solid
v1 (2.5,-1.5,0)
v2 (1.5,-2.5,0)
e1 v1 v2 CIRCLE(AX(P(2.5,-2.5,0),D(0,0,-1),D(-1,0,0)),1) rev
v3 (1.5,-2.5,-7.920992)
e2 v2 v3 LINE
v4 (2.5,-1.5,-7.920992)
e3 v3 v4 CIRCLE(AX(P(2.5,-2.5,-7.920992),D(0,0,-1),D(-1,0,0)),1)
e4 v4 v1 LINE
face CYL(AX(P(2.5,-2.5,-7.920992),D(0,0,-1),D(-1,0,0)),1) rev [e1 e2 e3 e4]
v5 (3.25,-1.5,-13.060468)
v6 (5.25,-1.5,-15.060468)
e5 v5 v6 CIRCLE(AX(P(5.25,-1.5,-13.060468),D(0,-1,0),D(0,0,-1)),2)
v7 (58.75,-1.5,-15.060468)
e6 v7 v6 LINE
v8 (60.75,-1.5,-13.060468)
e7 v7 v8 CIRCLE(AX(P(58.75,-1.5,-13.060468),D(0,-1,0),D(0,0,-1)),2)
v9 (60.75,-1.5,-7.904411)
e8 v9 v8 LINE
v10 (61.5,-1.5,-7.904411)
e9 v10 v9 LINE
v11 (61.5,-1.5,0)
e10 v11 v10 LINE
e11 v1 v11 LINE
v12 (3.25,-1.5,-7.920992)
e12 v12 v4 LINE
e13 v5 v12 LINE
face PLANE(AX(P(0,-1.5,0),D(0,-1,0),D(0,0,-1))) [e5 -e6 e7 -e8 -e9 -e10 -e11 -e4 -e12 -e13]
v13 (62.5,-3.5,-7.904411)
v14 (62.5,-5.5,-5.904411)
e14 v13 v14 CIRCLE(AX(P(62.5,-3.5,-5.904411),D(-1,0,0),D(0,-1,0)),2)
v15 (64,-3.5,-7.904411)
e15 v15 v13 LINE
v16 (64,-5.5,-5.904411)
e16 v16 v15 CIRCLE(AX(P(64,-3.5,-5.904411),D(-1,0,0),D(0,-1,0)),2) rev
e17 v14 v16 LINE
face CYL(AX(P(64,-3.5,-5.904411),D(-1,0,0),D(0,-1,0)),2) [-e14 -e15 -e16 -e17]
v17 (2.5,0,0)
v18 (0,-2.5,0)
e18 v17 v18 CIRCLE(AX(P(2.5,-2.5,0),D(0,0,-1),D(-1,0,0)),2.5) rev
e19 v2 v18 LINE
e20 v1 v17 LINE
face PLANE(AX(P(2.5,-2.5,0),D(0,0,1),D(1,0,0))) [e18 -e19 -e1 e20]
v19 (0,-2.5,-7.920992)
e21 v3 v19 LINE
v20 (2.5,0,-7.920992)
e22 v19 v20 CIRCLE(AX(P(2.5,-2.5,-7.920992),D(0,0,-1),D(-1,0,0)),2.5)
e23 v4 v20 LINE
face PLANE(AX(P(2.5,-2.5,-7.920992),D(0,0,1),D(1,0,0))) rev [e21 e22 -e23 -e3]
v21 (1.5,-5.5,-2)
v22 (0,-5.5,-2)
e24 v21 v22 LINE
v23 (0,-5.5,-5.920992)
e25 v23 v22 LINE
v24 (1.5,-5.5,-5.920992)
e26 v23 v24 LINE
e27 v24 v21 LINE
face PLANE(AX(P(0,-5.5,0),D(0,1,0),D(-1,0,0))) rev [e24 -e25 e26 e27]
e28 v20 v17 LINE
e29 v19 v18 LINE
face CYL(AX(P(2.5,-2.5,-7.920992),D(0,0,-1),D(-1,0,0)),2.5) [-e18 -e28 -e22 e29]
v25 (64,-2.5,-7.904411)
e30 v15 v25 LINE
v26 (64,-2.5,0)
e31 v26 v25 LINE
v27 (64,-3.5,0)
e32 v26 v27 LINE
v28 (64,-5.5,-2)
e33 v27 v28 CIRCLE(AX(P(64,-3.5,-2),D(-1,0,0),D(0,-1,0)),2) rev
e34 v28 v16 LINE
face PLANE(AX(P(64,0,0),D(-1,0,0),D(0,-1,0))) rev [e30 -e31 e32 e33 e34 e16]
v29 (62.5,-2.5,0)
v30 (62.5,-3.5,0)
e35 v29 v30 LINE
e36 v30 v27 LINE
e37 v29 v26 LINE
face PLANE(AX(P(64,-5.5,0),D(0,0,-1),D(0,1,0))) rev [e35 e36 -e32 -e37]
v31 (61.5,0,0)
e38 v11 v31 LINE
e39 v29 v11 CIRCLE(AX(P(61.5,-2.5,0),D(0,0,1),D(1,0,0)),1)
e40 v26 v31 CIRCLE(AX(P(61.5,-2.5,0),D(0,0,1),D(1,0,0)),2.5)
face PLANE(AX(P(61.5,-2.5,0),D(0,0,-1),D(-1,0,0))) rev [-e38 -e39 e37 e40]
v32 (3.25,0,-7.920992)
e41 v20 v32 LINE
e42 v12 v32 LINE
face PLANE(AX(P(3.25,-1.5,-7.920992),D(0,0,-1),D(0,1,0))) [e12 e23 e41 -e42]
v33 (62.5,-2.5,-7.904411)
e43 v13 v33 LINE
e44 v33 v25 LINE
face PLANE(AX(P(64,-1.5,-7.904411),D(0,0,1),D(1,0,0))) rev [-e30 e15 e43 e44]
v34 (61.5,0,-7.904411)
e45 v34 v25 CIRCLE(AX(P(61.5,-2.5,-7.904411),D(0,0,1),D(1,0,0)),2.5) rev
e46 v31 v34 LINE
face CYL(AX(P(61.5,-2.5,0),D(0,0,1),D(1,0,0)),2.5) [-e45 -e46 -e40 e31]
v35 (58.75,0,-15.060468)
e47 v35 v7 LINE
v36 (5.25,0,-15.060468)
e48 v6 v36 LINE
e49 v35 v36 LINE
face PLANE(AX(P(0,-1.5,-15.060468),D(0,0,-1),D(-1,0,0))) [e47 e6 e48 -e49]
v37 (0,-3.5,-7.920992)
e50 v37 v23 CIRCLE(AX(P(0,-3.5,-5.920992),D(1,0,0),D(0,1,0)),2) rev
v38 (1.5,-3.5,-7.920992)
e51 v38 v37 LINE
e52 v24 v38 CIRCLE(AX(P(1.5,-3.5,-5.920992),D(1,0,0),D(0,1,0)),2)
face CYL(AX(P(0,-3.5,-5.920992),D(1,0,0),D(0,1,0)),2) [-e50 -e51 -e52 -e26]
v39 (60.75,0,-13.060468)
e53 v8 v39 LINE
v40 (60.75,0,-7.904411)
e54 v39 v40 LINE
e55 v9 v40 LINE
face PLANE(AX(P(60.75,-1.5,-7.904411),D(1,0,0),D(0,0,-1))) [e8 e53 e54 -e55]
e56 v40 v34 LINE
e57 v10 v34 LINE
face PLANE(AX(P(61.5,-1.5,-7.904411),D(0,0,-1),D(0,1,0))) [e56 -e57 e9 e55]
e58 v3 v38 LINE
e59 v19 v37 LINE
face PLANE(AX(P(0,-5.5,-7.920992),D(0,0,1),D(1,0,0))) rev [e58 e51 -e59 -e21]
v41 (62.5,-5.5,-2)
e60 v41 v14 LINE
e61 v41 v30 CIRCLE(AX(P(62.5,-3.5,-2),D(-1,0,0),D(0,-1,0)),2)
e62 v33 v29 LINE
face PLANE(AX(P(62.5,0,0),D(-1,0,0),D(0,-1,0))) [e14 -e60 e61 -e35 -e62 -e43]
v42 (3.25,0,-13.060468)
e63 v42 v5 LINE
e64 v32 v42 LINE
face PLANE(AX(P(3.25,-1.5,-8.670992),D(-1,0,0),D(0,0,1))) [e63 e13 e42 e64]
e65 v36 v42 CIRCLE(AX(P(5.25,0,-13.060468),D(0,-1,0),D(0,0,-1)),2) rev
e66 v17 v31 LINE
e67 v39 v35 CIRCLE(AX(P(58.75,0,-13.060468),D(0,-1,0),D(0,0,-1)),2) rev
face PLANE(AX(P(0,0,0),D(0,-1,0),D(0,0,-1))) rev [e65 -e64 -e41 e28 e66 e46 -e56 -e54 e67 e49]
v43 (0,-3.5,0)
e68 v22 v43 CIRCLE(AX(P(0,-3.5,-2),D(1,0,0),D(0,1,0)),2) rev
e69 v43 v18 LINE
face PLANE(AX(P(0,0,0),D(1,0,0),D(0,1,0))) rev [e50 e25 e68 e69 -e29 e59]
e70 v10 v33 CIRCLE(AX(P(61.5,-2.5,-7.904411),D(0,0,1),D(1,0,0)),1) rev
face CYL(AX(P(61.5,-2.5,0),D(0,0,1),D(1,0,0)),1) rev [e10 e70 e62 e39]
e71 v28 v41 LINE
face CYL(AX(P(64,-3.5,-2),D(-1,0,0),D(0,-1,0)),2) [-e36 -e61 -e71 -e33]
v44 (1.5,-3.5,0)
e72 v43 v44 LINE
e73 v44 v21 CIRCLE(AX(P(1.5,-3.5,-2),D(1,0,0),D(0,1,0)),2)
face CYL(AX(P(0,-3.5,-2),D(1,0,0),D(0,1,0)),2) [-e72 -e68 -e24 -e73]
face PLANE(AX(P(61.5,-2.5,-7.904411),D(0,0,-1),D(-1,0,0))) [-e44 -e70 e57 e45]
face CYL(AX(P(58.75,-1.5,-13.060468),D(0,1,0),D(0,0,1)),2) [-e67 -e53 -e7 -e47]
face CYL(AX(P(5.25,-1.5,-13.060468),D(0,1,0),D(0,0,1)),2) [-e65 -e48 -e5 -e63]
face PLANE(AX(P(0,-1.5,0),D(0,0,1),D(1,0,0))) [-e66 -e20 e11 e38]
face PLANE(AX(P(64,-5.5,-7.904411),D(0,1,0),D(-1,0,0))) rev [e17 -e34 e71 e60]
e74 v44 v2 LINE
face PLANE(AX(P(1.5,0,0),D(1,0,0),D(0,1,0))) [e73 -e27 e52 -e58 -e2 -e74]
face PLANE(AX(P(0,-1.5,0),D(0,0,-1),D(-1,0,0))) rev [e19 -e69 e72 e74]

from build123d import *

# Parameters (mm, degrees)
SKETCH1_W                       = 64
SKETCH1_H                       = 15.060468003
BASE_FLANGE1_DEPTH              = 1.5
EDGE_FLANGE1_STRIP_W            = 8
EDGE_FLANGE1_STRIP_H            = 1.5
EDGE_FLANGE1_STRIP_CUT_DEPTH    = 7.904411042
EDGE_FLANGE1_RELIEF_W           = 8.75
EDGE_FLANGE1_RELIEF_H           = 0.75
EDGE_FLANGE1_RELIEF_CUT_DEPTH   = 1.5
EDGE_FLANGE1_STRIP_2_W          = 8
EDGE_FLANGE1_STRIP_2_H          = 1.5
EDGE_FLANGE1_STRIP_CUT_2_DEPTH  = 7.92099203
EDGE_FLANGE1_RELIEF_2_W         = 8.75
EDGE_FLANGE1_RELIEF_2_H         = 0.75
EDGE_FLANGE1_RELIEF_CUT_2_DEPTH = 1.5
EDGE_FLANGE1_DEPTH              = 7.904411042
EDGE_FLANGE1_BEND_DEPTH         = 7.92099203
SKETCH31_W                      = 3.25
SKETCH31_H                      = 6.406056961
SKETCH31_H_2                    = 6.389475973
CUT_EXTRUDE1_DEPTH              = 10
FILLET1_R                       = 2


# Sheet-metal steps are written as plain solids
with BuildPart() as part:
    # Sketch1 → Base-Flange1 (new body)
    with BuildSketch(Plane(origin=(0, 0, 0), x_dir=(1, 0, 0), z_dir=(0, 1, 0))):
        with Locations((32, 7.530234002)):
            Rectangle(SKETCH1_W, SKETCH1_H)
    extrude(amount=-BASE_FLANGE1_DEPTH)

    # Edge-Flange1 strip (across the edge) → Edge-Flange1 strip cut (cut)
    with BuildSketch(Plane(origin=(64, -1.5, -7.904411042), x_dir=(-1, 0, 0), z_dir=(0, 0, 1))):
        with Locations((-1.5, -0.75)):
            Rectangle(EDGE_FLANGE1_STRIP_W, EDGE_FLANGE1_STRIP_H)
    extrude(amount=EDGE_FLANGE1_STRIP_CUT_DEPTH, mode=Mode.SUBTRACT)

    # Edge-Flange1 relief (on the sheet) → Edge-Flange1 relief cut (cut)
    with BuildSketch(Plane(origin=(61.5, -1.5, -7.904411042), x_dir=(-1, 0, 0), z_dir=(0, -1, 0))):
        with Locations((-3.625, 0.375)):
            Rectangle(EDGE_FLANGE1_RELIEF_W, EDGE_FLANGE1_RELIEF_H)
    extrude(amount=-EDGE_FLANGE1_RELIEF_CUT_DEPTH, mode=Mode.SUBTRACT)

    # Edge-Flange1 strip 2 (across the edge) → Edge-Flange1 strip cut 2 (cut)
    with BuildSketch(Plane(origin=(0, -1.5, 0), x_dir=(1, 0, 0), z_dir=(0, 0, -1))):
        with Locations((-1.5, -0.75)):
            Rectangle(EDGE_FLANGE1_STRIP_2_W, EDGE_FLANGE1_STRIP_2_H)
    extrude(amount=EDGE_FLANGE1_STRIP_CUT_2_DEPTH, mode=Mode.SUBTRACT)

    # Edge-Flange1 relief 2 (on the sheet) → Edge-Flange1 relief cut 2 (cut)
    with BuildSketch(Plane(origin=(2.5, -1.5, 0), x_dir=(1, 0, 0), z_dir=(0, -1, 0))):
        with Locations((-3.625, -8.29599203)):
            Rectangle(EDGE_FLANGE1_RELIEF_2_W, EDGE_FLANGE1_RELIEF_2_H)
    extrude(amount=-EDGE_FLANGE1_RELIEF_CUT_2_DEPTH, mode=Mode.SUBTRACT)

    # Edge-Flange1 section (across the edge) → Edge-Flange1 (add)
    with BuildSketch(Plane(origin=(64, -1.5, -7.904411042), x_dir=(-1, 0, 0), z_dir=(0, 0, 1))):
        with BuildLine():
            Line((0, 1), (0, 4))
            Line((0, 4), (1.5, 4))
            Line((1.5, 4), (1.5, 1))
            ThreePointArc((1.5, 1), (1.792893219, 0.292893219), (2.5, 0))
            Line((2.5, 0), (2.5, -1.5))
            ThreePointArc((2.5, -1.5), (0.732233047, -0.767766953), (0, 1))
        make_face()
    extrude(amount=EDGE_FLANGE1_DEPTH)

    # Edge-Flange1 section 2 (across the edge) → Edge-Flange1 bend (add)
    with BuildSketch(Plane(origin=(0, -1.5, 0), x_dir=(1, 0, 0), z_dir=(0, 0, -1))):
        with BuildLine():
            Line((0, 1), (0, 4))
            Line((0, 4), (1.5, 4))
            Line((1.5, 4), (1.5, 1))
            ThreePointArc((1.5, 1), (1.792893219, 0.292893219), (2.5, 0))
            Line((2.5, 0), (2.5, -1.5))
            ThreePointArc((2.5, -1.5), (0.732233047, -0.767766953), (0, 1))
        make_face()
    extrude(amount=EDGE_FLANGE1_BEND_DEPTH)

    # Sketch31 → Cut-Extrude1 (cut)
    with BuildSketch(Plane(origin=(0, 0, 0), x_dir=(1, 0, 0), z_dir=(0, 1, 0))):
        with Locations((62.375, 11.857439523)):
            Rectangle(SKETCH31_W, SKETCH31_H)
        with Locations((1.625, 11.865730017)):
            Rectangle(SKETCH31_W, SKETCH31_H_2)
    extrude(amount=-CUT_EXTRUDE1_DEPTH, mode=Mode.SUBTRACT)

    # Fillet1
    fillet1_edges = [part.edges().sort_by_distance(p)[0] for p in [
        (60.75, -0.75, -15.060468003),
        (3.25, -0.75, -15.060468003),
        (63.25, -5.5, -7.904411042),
        (63.25, -5.5, 0),
        (0.75, -5.5, 0),
        (0.75, -5.5, -7.92099203),
    ]]
    fillet(fillet1_edges, radius=FILLET1_R)


solid = part.part
